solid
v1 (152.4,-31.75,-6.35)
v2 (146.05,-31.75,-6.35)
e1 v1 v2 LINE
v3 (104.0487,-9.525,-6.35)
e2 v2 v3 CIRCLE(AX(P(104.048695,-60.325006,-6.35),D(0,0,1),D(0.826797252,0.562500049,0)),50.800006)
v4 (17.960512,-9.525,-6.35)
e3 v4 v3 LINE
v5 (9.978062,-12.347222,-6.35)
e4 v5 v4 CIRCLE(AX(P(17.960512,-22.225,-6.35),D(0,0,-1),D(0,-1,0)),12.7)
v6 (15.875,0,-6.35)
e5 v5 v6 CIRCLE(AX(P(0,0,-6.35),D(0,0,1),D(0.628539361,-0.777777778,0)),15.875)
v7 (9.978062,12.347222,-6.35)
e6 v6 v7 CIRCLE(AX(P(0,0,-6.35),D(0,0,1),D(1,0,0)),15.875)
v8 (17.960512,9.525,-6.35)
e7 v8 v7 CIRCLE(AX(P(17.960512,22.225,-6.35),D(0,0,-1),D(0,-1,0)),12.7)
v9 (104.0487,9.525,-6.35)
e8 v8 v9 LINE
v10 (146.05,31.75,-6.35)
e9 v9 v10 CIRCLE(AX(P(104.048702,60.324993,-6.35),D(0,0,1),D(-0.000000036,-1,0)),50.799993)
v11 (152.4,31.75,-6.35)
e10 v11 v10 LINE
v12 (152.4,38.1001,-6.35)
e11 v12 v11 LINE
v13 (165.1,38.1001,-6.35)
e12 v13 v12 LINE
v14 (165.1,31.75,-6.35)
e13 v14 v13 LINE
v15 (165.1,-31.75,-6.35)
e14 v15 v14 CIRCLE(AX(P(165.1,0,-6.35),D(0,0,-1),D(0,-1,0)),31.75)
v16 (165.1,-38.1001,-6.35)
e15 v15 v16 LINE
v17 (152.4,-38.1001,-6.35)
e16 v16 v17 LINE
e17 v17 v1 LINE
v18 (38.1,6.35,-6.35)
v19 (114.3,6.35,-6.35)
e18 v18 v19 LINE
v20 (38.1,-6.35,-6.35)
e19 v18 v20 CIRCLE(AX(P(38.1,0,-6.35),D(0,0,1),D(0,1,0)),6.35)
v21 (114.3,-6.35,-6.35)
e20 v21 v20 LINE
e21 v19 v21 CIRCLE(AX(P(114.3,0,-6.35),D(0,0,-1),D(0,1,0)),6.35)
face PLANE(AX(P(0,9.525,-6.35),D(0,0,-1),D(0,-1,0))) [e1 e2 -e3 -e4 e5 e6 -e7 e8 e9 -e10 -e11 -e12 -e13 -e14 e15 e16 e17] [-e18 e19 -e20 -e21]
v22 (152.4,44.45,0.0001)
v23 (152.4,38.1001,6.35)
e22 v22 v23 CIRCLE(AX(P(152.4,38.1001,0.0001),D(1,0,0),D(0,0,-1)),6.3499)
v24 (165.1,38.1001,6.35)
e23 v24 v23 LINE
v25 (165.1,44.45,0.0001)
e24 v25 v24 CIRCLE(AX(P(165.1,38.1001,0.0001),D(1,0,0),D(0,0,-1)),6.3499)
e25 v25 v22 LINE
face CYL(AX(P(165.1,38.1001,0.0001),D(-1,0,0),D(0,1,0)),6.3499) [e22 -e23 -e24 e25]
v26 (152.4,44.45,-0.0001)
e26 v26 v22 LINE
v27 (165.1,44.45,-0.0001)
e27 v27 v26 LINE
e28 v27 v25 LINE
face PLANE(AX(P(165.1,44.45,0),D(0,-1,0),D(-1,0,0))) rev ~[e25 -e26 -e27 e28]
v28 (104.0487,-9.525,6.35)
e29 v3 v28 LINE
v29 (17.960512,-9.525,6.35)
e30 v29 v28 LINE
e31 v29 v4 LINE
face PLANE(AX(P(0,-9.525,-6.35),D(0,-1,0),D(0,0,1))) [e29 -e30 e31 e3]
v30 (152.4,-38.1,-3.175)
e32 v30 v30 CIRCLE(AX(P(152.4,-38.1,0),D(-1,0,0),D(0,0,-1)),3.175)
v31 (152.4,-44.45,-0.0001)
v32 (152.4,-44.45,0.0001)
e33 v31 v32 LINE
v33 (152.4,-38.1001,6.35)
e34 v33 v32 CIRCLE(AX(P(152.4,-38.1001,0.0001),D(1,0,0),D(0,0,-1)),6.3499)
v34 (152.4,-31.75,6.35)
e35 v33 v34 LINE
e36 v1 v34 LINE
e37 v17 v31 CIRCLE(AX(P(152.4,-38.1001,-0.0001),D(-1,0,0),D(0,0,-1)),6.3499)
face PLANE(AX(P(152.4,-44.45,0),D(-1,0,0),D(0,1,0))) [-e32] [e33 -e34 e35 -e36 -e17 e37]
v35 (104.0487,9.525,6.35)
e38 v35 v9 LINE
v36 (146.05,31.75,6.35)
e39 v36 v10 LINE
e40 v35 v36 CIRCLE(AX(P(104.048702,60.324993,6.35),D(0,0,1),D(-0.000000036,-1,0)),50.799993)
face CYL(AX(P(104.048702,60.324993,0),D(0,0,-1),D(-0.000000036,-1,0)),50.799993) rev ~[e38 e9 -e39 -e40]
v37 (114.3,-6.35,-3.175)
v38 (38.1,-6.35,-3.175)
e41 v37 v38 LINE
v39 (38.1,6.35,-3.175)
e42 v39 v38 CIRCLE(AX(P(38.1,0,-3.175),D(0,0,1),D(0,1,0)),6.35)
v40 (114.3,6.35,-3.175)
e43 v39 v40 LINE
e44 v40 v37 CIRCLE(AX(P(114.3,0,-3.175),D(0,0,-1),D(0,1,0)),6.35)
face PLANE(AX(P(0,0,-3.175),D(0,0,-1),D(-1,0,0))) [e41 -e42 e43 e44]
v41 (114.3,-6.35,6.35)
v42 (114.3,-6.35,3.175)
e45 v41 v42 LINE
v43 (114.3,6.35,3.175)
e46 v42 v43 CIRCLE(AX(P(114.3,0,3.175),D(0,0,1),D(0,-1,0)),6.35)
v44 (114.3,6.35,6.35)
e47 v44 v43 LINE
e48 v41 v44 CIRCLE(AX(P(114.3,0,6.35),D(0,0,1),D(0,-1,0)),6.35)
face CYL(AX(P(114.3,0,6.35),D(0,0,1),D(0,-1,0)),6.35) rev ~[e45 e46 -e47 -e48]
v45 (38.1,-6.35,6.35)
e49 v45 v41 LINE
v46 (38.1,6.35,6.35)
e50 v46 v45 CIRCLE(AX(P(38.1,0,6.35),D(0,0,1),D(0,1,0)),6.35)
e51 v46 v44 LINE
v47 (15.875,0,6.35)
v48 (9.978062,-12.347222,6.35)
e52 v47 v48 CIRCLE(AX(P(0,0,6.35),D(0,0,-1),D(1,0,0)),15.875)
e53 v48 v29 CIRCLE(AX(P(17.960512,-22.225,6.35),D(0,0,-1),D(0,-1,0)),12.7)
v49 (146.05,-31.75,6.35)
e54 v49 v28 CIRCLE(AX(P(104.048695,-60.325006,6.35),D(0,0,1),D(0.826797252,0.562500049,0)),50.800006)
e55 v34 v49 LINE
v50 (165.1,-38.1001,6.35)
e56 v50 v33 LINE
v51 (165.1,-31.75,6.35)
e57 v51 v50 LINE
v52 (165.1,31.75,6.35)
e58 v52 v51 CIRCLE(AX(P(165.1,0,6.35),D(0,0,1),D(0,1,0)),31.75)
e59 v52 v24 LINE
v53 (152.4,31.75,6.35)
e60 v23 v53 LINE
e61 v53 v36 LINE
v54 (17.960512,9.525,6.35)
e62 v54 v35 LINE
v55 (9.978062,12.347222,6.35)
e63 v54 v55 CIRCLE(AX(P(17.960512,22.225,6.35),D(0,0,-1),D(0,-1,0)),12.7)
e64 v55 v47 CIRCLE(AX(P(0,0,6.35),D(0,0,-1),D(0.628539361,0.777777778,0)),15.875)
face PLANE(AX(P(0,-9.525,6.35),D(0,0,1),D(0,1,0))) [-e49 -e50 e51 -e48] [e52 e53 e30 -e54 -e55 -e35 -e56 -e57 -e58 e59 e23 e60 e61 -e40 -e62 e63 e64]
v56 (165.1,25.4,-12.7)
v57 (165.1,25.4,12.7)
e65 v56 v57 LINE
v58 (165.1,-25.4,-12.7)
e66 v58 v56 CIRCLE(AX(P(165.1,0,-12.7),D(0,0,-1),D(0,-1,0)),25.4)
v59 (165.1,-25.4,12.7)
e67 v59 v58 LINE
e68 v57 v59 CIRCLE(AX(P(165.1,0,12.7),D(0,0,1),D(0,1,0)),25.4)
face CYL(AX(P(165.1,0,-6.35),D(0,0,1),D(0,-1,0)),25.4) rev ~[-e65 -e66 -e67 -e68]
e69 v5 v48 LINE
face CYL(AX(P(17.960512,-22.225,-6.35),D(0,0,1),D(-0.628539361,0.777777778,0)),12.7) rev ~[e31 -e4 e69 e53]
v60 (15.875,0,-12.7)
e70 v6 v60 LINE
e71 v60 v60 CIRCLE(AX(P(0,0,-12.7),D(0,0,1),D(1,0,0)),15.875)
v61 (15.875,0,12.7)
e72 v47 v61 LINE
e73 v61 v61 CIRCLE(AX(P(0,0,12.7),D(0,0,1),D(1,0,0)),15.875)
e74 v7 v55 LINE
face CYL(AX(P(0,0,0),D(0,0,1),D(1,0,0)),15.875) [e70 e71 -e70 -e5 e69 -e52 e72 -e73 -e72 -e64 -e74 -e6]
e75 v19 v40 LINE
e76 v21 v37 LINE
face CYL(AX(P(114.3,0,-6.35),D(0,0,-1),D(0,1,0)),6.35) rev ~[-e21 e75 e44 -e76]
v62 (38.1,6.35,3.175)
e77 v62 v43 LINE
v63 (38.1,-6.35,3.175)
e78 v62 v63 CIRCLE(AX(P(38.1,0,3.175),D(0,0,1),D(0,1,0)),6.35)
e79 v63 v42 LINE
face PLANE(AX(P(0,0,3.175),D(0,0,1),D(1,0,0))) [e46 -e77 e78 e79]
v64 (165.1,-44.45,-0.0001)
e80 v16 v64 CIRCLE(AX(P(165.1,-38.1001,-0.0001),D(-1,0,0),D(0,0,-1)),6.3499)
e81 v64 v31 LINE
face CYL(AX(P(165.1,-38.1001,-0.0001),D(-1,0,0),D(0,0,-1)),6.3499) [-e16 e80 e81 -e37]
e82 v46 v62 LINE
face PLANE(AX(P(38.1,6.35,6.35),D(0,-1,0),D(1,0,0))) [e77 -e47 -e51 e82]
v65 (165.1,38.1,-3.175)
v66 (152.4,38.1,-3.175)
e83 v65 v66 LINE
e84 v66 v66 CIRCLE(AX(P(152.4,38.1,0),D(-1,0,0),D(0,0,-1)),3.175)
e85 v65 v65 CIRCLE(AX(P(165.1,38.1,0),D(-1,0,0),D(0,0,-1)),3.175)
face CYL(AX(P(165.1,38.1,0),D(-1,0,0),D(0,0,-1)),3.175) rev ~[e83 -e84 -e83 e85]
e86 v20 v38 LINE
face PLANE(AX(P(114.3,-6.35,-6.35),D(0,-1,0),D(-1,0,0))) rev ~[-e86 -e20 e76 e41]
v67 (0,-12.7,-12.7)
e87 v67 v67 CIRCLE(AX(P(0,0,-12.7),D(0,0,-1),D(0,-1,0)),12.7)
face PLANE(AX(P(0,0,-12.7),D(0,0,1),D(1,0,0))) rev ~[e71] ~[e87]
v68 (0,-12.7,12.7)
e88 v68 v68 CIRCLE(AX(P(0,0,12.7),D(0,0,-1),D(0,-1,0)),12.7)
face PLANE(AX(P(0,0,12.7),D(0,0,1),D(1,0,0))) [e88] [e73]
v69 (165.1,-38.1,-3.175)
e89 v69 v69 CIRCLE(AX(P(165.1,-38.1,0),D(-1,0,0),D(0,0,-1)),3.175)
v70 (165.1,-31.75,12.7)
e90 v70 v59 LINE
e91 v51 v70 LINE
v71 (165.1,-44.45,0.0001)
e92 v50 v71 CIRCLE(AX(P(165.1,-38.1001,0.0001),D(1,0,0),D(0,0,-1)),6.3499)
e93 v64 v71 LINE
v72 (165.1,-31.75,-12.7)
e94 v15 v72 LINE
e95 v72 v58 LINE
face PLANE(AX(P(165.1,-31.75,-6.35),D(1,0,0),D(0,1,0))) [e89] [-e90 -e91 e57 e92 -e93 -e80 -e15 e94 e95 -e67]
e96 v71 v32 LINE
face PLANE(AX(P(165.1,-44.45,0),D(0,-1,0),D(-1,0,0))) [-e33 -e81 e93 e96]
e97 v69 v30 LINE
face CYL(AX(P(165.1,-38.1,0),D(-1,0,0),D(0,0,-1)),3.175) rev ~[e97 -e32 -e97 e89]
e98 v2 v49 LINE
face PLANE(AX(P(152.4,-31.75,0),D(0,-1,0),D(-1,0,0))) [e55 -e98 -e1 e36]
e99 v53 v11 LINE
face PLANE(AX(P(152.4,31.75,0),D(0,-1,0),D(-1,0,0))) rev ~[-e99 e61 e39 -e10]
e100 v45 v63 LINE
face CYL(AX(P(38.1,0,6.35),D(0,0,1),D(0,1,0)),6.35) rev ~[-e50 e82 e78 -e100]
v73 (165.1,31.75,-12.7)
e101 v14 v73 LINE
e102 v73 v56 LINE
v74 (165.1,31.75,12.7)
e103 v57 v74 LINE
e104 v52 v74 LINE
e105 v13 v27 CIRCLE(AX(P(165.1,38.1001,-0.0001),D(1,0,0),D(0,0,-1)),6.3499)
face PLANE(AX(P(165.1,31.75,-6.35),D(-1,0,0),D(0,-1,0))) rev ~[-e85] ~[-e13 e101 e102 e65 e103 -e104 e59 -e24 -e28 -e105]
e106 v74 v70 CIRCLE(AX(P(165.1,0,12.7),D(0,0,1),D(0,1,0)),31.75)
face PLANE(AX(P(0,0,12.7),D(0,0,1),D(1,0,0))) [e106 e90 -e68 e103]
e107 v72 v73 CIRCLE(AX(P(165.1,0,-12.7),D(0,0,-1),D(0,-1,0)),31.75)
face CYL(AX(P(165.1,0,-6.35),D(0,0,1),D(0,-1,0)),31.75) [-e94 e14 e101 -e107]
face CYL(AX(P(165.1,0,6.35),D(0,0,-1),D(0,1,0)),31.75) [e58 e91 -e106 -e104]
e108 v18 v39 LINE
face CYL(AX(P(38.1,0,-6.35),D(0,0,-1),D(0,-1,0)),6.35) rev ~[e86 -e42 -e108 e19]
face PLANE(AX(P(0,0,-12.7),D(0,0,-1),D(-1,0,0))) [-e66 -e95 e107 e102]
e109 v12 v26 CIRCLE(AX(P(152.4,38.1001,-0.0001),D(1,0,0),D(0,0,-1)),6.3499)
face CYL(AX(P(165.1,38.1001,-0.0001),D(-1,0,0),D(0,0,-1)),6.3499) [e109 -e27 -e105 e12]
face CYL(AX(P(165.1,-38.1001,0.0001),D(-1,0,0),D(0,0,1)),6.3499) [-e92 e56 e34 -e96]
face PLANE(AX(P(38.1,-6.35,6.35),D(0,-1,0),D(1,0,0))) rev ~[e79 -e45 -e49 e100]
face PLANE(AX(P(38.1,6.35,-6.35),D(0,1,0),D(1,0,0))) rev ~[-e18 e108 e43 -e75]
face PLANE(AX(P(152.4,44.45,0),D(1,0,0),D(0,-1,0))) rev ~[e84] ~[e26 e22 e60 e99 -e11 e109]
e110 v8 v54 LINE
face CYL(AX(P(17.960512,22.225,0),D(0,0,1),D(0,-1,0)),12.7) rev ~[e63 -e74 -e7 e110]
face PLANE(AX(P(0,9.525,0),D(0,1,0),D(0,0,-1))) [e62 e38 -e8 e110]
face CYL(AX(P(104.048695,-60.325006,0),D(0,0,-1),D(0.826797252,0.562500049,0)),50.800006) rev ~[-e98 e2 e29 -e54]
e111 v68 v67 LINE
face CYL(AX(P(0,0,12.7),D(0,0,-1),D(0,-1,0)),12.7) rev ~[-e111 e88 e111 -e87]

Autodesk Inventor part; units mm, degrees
ref_plane "YZ Plane" through (0, 0, 0) normal (1, 0, 0) x (0, 1, 0)
ref_plane "XZ Plane" through (0, 0, 0) normal (0, 1, 0) x (-1, 0, 0)
ref_plane "XY Plane" through (0, 0, 0) normal (0, 0, 1) x (1, 0, 0)
sketch "Sketch1" plane through (0, 0, 0) normal (0, 0, 1) x (1, 0, 0)
  circle A0 centre (0, 0) radius 15.875
  dimension "d0" = 31.75
extrude "Extrusion1" add sketch "Sketch1" along normal mid plane 25.4
sketch "Sketch2" plane through (0, 0, 0) normal (1, 0, 0) x (0, 1, 0)
  line L0 (0, 0) -> (9.525, 0)
  line L1 (9.525, 0) -> (9.525, -6.35)
  line L2 (9.525, -6.35) -> (-9.525, -6.35)
  line L3 (-9.525, -6.35) -> (-9.525, 6.35)
  line L4 (-9.525, 6.35) -> (9.525, 6.35)
  line L5 (9.525, 6.35) -> (9.525, 0)
  dimension "d3" = 9.525
  dimension "d4" = 6.35
  dimension "d5" = 19.05
  dimension "d6" = 12.7
extrude "Extrusion2" add sketch "Sketch2" along normal blind 114.3
fillet "Fillet1" radius 12.7 3 edges at (12.7, 9.525, -3.175) (12.7, -9.525, -3.175) (12.7, -9.525, 3.175)
sketch "Sketch3" plane through (0, 0, 0) normal (0, 0, 1) x (1, 0, 0)
  point P0 (0, 0)
sketch "Sketch4" plane through (0, 0, 12.7) normal (0, 0, 1) x (1, 0, 0)
  point P0 (0, 0)
  point P1 (0, 0)
hole "Hole1" at (0, 0, 12.7) direction (0, 0, -1) diameter 25.4 depth 25.4 tip angle 118
sketch "Sketch7" plane through (0, 0, 0) normal (0, 0, 1) x (1, 0, 0)
  line L0 (114.3, 9.525) -> (114.3, -9.525) projected
  arc A0 (165.1, 25.4) -> (165.1, -25.4) centre (165.1, 0) ccw
  line L1 (165.1, 25.4) -> (165.1, 44.45)
  line L2 (165.1, 44.45) -> (152.4, 44.45)
  line L3 (152.4, 44.45) -> (152.4, 31.75)
  line L4 (152.4, 31.75) -> (146.05, 31.75)
  arc A1 (104.0487, 9.525) -> (146.05, 31.75) centre (104.0487, 60.325) ccw
  line L5 (17.9605, 9.525) -> (114.3, 9.525) projected
  line L6 (165.1, -25.4) -> (165.1, -44.45)
  line L7 (165.1, -44.45) -> (152.4, -44.45)
  line L8 (152.4, -44.45) -> (152.4, -31.75)
  line L9 (152.4, -31.75) -> (146.05, -31.75)
  arc A2 (146.05, -31.75) -> (104.0487, -9.525) centre (104.0487, -60.325) ccw
  line L10 (0, -84.455) -> (0, 84.455) projected
  line L11 (-52.07, 0) -> (201.295, 0) projected
  line L12 (17.9605, -9.525) -> (114.3, -9.525) projected
  point P0 (0, 0)
  point P1 (139.7, 0)
  dimension "d40" = 19.05
  dimension "d41" = 12.7
  dimension "d42" = 12.7
  dimension "d43" = 6.35
  dimension "d45" = 25.4
  dimension "d46" = 50.8
  dimension "d47" = 19.05
  dimension "d48" = 88.9
  dimension "d49" = 165.1
extrude "Extrusion3" add sketch "Sketch7" along normal mid plane 12.7
sketch "Sketch11" plane through (0, 0, 6.35) normal (0, 0, 1) x (1, 0, 0)
  arc A0 (165.1, 31.75) -> (165.1, -31.75) centre (165.1, 0) ccw
  arc A1 (165.1, 25.4) -> (165.1, -25.4) centre (165.1, 0) ccw projected
  arc A2 (165.1, 25.4) -> (165.1, -25.4) centre (165.1, 0) ccw
  line L0 (165.1, 25.4) -> (165.1, 44.45) projected
  line L1 (165.1, 31.75) -> (165.1, 25.4)
  line L2 (165.1, -44.45) -> (165.1, -25.4) projected
  line L3 (165.1, -25.4) -> (165.1, -31.75)
  point P0 (0, 0)
  dimension "d56" = 25.4
  dimension "d57" = 31.75
extrude "Extrusion5" add sketch "Sketch11" along normal blind 6.35
sketch "Sketch12" plane through (0, 0, -6.35) normal (0, 0, -1) x (-1, 0, 0)
  arc A0 (-165.1, -25.4) -> (-165.1, 25.4) centre (-165.1, 0) ccw projected
  arc A1 (-165.1, -25.4) -> (-165.1, 25.4) centre (-165.1, 0) ccw
  arc A2 (-165.1, -31.75) -> (-165.1, 31.75) centre (-165.1, 0) ccw
  line L0 (-165.1, 44.45) -> (-165.1, 25.4) projected
  line L1 (-165.1, 31.75) -> (-165.1, 25.4)
  line L2 (-165.1, -31.75) -> (-165.1, -25.4) projected
  line L3 (-165.1, -25.4) -> (-165.1, -31.75)
  point P0 (0, 0)
extrude "Extrusion6" add sketch "Sketch12" along normal blind 6.35
sketch "Sketch13" plane through (165.1, 44.45, 6.35) normal (1, 0, 0) x (0, 0, -1)
  point P0 (6.35, -44.45)
  point P1 (6.35, -6.35)
  point P2 (6.35, -82.55)
hole "Hole2" at (165.1, 38.1, 0) at (165.1, -38.1, 0) direction (-1, 0, 0) diameter 6.35 depth 12.7 tip angle 118
fillet "Fillet2" radius 6.35 4 edges at (158.75, 44.45, 6.35) (158.75, 44.45, -6.35) (158.75, -44.45, 6.35) (158.75, -44.45, -6.35)
sketch "Sketch14" plane through (0, 0, 6.35) normal (0, 0, 1) x (1, 0, 0)
  line L0 (17.9605, -9.525) -> (104.0487, -9.525) projected
  line L1 (0, -62.23) -> (0, 62.23) projected
  arc A0 (38.1, 6.35) -> (38.1, -6.35) centre (38.1, 0) ccw
  line L2 (38.1, 6.35) -> (114.3, 6.35)
  line L3 (38.1, -6.35) -> (114.3, -6.35)
  arc A1 (114.3, -6.35) -> (114.3, 6.35) centre (114.3, 0) ccw
  point P0 (0, 0)
  dimension "d73" = 12.7
  dimension "d74" = 76.2
  dimension "d75" = 76.2
  dimension "d76" = 12.7
  dimension "d77" = 38.1
extrude "Extrusion7" cut sketch "Sketch14" against normal blind 3.175
sketch "Sketch15" plane through (0, 0, -6.35) normal (0, 0, -1) x (-1, 0, 0)
  line L0 (0, 0) -> (-38.1, 0)
  arc A0 (-38.1, -6.35) -> (-38.1, 6.35) centre (-38.1, 0) ccw
  line L1 (-38.1, 6.35) -> (-114.3, 6.35)
  line L2 (-38.1, 6.35) -> (-114.3, 6.35)
  line L3 (-114.3, -6.35) -> (-38.1, -6.35) projected
  line L4 (-38.1, -6.35) -> (-114.3, -6.35)
  arc A1 (-114.3, 6.35) -> (-114.3, -6.35) centre (-114.3, 0) ccw
  dimension "d80" = 38.1
  dimension "d82" = 76.2
extrude "Extrusion8" cut sketch "Sketch15" against normal blind 3.175
properties part number "Ch4 Part 3"
